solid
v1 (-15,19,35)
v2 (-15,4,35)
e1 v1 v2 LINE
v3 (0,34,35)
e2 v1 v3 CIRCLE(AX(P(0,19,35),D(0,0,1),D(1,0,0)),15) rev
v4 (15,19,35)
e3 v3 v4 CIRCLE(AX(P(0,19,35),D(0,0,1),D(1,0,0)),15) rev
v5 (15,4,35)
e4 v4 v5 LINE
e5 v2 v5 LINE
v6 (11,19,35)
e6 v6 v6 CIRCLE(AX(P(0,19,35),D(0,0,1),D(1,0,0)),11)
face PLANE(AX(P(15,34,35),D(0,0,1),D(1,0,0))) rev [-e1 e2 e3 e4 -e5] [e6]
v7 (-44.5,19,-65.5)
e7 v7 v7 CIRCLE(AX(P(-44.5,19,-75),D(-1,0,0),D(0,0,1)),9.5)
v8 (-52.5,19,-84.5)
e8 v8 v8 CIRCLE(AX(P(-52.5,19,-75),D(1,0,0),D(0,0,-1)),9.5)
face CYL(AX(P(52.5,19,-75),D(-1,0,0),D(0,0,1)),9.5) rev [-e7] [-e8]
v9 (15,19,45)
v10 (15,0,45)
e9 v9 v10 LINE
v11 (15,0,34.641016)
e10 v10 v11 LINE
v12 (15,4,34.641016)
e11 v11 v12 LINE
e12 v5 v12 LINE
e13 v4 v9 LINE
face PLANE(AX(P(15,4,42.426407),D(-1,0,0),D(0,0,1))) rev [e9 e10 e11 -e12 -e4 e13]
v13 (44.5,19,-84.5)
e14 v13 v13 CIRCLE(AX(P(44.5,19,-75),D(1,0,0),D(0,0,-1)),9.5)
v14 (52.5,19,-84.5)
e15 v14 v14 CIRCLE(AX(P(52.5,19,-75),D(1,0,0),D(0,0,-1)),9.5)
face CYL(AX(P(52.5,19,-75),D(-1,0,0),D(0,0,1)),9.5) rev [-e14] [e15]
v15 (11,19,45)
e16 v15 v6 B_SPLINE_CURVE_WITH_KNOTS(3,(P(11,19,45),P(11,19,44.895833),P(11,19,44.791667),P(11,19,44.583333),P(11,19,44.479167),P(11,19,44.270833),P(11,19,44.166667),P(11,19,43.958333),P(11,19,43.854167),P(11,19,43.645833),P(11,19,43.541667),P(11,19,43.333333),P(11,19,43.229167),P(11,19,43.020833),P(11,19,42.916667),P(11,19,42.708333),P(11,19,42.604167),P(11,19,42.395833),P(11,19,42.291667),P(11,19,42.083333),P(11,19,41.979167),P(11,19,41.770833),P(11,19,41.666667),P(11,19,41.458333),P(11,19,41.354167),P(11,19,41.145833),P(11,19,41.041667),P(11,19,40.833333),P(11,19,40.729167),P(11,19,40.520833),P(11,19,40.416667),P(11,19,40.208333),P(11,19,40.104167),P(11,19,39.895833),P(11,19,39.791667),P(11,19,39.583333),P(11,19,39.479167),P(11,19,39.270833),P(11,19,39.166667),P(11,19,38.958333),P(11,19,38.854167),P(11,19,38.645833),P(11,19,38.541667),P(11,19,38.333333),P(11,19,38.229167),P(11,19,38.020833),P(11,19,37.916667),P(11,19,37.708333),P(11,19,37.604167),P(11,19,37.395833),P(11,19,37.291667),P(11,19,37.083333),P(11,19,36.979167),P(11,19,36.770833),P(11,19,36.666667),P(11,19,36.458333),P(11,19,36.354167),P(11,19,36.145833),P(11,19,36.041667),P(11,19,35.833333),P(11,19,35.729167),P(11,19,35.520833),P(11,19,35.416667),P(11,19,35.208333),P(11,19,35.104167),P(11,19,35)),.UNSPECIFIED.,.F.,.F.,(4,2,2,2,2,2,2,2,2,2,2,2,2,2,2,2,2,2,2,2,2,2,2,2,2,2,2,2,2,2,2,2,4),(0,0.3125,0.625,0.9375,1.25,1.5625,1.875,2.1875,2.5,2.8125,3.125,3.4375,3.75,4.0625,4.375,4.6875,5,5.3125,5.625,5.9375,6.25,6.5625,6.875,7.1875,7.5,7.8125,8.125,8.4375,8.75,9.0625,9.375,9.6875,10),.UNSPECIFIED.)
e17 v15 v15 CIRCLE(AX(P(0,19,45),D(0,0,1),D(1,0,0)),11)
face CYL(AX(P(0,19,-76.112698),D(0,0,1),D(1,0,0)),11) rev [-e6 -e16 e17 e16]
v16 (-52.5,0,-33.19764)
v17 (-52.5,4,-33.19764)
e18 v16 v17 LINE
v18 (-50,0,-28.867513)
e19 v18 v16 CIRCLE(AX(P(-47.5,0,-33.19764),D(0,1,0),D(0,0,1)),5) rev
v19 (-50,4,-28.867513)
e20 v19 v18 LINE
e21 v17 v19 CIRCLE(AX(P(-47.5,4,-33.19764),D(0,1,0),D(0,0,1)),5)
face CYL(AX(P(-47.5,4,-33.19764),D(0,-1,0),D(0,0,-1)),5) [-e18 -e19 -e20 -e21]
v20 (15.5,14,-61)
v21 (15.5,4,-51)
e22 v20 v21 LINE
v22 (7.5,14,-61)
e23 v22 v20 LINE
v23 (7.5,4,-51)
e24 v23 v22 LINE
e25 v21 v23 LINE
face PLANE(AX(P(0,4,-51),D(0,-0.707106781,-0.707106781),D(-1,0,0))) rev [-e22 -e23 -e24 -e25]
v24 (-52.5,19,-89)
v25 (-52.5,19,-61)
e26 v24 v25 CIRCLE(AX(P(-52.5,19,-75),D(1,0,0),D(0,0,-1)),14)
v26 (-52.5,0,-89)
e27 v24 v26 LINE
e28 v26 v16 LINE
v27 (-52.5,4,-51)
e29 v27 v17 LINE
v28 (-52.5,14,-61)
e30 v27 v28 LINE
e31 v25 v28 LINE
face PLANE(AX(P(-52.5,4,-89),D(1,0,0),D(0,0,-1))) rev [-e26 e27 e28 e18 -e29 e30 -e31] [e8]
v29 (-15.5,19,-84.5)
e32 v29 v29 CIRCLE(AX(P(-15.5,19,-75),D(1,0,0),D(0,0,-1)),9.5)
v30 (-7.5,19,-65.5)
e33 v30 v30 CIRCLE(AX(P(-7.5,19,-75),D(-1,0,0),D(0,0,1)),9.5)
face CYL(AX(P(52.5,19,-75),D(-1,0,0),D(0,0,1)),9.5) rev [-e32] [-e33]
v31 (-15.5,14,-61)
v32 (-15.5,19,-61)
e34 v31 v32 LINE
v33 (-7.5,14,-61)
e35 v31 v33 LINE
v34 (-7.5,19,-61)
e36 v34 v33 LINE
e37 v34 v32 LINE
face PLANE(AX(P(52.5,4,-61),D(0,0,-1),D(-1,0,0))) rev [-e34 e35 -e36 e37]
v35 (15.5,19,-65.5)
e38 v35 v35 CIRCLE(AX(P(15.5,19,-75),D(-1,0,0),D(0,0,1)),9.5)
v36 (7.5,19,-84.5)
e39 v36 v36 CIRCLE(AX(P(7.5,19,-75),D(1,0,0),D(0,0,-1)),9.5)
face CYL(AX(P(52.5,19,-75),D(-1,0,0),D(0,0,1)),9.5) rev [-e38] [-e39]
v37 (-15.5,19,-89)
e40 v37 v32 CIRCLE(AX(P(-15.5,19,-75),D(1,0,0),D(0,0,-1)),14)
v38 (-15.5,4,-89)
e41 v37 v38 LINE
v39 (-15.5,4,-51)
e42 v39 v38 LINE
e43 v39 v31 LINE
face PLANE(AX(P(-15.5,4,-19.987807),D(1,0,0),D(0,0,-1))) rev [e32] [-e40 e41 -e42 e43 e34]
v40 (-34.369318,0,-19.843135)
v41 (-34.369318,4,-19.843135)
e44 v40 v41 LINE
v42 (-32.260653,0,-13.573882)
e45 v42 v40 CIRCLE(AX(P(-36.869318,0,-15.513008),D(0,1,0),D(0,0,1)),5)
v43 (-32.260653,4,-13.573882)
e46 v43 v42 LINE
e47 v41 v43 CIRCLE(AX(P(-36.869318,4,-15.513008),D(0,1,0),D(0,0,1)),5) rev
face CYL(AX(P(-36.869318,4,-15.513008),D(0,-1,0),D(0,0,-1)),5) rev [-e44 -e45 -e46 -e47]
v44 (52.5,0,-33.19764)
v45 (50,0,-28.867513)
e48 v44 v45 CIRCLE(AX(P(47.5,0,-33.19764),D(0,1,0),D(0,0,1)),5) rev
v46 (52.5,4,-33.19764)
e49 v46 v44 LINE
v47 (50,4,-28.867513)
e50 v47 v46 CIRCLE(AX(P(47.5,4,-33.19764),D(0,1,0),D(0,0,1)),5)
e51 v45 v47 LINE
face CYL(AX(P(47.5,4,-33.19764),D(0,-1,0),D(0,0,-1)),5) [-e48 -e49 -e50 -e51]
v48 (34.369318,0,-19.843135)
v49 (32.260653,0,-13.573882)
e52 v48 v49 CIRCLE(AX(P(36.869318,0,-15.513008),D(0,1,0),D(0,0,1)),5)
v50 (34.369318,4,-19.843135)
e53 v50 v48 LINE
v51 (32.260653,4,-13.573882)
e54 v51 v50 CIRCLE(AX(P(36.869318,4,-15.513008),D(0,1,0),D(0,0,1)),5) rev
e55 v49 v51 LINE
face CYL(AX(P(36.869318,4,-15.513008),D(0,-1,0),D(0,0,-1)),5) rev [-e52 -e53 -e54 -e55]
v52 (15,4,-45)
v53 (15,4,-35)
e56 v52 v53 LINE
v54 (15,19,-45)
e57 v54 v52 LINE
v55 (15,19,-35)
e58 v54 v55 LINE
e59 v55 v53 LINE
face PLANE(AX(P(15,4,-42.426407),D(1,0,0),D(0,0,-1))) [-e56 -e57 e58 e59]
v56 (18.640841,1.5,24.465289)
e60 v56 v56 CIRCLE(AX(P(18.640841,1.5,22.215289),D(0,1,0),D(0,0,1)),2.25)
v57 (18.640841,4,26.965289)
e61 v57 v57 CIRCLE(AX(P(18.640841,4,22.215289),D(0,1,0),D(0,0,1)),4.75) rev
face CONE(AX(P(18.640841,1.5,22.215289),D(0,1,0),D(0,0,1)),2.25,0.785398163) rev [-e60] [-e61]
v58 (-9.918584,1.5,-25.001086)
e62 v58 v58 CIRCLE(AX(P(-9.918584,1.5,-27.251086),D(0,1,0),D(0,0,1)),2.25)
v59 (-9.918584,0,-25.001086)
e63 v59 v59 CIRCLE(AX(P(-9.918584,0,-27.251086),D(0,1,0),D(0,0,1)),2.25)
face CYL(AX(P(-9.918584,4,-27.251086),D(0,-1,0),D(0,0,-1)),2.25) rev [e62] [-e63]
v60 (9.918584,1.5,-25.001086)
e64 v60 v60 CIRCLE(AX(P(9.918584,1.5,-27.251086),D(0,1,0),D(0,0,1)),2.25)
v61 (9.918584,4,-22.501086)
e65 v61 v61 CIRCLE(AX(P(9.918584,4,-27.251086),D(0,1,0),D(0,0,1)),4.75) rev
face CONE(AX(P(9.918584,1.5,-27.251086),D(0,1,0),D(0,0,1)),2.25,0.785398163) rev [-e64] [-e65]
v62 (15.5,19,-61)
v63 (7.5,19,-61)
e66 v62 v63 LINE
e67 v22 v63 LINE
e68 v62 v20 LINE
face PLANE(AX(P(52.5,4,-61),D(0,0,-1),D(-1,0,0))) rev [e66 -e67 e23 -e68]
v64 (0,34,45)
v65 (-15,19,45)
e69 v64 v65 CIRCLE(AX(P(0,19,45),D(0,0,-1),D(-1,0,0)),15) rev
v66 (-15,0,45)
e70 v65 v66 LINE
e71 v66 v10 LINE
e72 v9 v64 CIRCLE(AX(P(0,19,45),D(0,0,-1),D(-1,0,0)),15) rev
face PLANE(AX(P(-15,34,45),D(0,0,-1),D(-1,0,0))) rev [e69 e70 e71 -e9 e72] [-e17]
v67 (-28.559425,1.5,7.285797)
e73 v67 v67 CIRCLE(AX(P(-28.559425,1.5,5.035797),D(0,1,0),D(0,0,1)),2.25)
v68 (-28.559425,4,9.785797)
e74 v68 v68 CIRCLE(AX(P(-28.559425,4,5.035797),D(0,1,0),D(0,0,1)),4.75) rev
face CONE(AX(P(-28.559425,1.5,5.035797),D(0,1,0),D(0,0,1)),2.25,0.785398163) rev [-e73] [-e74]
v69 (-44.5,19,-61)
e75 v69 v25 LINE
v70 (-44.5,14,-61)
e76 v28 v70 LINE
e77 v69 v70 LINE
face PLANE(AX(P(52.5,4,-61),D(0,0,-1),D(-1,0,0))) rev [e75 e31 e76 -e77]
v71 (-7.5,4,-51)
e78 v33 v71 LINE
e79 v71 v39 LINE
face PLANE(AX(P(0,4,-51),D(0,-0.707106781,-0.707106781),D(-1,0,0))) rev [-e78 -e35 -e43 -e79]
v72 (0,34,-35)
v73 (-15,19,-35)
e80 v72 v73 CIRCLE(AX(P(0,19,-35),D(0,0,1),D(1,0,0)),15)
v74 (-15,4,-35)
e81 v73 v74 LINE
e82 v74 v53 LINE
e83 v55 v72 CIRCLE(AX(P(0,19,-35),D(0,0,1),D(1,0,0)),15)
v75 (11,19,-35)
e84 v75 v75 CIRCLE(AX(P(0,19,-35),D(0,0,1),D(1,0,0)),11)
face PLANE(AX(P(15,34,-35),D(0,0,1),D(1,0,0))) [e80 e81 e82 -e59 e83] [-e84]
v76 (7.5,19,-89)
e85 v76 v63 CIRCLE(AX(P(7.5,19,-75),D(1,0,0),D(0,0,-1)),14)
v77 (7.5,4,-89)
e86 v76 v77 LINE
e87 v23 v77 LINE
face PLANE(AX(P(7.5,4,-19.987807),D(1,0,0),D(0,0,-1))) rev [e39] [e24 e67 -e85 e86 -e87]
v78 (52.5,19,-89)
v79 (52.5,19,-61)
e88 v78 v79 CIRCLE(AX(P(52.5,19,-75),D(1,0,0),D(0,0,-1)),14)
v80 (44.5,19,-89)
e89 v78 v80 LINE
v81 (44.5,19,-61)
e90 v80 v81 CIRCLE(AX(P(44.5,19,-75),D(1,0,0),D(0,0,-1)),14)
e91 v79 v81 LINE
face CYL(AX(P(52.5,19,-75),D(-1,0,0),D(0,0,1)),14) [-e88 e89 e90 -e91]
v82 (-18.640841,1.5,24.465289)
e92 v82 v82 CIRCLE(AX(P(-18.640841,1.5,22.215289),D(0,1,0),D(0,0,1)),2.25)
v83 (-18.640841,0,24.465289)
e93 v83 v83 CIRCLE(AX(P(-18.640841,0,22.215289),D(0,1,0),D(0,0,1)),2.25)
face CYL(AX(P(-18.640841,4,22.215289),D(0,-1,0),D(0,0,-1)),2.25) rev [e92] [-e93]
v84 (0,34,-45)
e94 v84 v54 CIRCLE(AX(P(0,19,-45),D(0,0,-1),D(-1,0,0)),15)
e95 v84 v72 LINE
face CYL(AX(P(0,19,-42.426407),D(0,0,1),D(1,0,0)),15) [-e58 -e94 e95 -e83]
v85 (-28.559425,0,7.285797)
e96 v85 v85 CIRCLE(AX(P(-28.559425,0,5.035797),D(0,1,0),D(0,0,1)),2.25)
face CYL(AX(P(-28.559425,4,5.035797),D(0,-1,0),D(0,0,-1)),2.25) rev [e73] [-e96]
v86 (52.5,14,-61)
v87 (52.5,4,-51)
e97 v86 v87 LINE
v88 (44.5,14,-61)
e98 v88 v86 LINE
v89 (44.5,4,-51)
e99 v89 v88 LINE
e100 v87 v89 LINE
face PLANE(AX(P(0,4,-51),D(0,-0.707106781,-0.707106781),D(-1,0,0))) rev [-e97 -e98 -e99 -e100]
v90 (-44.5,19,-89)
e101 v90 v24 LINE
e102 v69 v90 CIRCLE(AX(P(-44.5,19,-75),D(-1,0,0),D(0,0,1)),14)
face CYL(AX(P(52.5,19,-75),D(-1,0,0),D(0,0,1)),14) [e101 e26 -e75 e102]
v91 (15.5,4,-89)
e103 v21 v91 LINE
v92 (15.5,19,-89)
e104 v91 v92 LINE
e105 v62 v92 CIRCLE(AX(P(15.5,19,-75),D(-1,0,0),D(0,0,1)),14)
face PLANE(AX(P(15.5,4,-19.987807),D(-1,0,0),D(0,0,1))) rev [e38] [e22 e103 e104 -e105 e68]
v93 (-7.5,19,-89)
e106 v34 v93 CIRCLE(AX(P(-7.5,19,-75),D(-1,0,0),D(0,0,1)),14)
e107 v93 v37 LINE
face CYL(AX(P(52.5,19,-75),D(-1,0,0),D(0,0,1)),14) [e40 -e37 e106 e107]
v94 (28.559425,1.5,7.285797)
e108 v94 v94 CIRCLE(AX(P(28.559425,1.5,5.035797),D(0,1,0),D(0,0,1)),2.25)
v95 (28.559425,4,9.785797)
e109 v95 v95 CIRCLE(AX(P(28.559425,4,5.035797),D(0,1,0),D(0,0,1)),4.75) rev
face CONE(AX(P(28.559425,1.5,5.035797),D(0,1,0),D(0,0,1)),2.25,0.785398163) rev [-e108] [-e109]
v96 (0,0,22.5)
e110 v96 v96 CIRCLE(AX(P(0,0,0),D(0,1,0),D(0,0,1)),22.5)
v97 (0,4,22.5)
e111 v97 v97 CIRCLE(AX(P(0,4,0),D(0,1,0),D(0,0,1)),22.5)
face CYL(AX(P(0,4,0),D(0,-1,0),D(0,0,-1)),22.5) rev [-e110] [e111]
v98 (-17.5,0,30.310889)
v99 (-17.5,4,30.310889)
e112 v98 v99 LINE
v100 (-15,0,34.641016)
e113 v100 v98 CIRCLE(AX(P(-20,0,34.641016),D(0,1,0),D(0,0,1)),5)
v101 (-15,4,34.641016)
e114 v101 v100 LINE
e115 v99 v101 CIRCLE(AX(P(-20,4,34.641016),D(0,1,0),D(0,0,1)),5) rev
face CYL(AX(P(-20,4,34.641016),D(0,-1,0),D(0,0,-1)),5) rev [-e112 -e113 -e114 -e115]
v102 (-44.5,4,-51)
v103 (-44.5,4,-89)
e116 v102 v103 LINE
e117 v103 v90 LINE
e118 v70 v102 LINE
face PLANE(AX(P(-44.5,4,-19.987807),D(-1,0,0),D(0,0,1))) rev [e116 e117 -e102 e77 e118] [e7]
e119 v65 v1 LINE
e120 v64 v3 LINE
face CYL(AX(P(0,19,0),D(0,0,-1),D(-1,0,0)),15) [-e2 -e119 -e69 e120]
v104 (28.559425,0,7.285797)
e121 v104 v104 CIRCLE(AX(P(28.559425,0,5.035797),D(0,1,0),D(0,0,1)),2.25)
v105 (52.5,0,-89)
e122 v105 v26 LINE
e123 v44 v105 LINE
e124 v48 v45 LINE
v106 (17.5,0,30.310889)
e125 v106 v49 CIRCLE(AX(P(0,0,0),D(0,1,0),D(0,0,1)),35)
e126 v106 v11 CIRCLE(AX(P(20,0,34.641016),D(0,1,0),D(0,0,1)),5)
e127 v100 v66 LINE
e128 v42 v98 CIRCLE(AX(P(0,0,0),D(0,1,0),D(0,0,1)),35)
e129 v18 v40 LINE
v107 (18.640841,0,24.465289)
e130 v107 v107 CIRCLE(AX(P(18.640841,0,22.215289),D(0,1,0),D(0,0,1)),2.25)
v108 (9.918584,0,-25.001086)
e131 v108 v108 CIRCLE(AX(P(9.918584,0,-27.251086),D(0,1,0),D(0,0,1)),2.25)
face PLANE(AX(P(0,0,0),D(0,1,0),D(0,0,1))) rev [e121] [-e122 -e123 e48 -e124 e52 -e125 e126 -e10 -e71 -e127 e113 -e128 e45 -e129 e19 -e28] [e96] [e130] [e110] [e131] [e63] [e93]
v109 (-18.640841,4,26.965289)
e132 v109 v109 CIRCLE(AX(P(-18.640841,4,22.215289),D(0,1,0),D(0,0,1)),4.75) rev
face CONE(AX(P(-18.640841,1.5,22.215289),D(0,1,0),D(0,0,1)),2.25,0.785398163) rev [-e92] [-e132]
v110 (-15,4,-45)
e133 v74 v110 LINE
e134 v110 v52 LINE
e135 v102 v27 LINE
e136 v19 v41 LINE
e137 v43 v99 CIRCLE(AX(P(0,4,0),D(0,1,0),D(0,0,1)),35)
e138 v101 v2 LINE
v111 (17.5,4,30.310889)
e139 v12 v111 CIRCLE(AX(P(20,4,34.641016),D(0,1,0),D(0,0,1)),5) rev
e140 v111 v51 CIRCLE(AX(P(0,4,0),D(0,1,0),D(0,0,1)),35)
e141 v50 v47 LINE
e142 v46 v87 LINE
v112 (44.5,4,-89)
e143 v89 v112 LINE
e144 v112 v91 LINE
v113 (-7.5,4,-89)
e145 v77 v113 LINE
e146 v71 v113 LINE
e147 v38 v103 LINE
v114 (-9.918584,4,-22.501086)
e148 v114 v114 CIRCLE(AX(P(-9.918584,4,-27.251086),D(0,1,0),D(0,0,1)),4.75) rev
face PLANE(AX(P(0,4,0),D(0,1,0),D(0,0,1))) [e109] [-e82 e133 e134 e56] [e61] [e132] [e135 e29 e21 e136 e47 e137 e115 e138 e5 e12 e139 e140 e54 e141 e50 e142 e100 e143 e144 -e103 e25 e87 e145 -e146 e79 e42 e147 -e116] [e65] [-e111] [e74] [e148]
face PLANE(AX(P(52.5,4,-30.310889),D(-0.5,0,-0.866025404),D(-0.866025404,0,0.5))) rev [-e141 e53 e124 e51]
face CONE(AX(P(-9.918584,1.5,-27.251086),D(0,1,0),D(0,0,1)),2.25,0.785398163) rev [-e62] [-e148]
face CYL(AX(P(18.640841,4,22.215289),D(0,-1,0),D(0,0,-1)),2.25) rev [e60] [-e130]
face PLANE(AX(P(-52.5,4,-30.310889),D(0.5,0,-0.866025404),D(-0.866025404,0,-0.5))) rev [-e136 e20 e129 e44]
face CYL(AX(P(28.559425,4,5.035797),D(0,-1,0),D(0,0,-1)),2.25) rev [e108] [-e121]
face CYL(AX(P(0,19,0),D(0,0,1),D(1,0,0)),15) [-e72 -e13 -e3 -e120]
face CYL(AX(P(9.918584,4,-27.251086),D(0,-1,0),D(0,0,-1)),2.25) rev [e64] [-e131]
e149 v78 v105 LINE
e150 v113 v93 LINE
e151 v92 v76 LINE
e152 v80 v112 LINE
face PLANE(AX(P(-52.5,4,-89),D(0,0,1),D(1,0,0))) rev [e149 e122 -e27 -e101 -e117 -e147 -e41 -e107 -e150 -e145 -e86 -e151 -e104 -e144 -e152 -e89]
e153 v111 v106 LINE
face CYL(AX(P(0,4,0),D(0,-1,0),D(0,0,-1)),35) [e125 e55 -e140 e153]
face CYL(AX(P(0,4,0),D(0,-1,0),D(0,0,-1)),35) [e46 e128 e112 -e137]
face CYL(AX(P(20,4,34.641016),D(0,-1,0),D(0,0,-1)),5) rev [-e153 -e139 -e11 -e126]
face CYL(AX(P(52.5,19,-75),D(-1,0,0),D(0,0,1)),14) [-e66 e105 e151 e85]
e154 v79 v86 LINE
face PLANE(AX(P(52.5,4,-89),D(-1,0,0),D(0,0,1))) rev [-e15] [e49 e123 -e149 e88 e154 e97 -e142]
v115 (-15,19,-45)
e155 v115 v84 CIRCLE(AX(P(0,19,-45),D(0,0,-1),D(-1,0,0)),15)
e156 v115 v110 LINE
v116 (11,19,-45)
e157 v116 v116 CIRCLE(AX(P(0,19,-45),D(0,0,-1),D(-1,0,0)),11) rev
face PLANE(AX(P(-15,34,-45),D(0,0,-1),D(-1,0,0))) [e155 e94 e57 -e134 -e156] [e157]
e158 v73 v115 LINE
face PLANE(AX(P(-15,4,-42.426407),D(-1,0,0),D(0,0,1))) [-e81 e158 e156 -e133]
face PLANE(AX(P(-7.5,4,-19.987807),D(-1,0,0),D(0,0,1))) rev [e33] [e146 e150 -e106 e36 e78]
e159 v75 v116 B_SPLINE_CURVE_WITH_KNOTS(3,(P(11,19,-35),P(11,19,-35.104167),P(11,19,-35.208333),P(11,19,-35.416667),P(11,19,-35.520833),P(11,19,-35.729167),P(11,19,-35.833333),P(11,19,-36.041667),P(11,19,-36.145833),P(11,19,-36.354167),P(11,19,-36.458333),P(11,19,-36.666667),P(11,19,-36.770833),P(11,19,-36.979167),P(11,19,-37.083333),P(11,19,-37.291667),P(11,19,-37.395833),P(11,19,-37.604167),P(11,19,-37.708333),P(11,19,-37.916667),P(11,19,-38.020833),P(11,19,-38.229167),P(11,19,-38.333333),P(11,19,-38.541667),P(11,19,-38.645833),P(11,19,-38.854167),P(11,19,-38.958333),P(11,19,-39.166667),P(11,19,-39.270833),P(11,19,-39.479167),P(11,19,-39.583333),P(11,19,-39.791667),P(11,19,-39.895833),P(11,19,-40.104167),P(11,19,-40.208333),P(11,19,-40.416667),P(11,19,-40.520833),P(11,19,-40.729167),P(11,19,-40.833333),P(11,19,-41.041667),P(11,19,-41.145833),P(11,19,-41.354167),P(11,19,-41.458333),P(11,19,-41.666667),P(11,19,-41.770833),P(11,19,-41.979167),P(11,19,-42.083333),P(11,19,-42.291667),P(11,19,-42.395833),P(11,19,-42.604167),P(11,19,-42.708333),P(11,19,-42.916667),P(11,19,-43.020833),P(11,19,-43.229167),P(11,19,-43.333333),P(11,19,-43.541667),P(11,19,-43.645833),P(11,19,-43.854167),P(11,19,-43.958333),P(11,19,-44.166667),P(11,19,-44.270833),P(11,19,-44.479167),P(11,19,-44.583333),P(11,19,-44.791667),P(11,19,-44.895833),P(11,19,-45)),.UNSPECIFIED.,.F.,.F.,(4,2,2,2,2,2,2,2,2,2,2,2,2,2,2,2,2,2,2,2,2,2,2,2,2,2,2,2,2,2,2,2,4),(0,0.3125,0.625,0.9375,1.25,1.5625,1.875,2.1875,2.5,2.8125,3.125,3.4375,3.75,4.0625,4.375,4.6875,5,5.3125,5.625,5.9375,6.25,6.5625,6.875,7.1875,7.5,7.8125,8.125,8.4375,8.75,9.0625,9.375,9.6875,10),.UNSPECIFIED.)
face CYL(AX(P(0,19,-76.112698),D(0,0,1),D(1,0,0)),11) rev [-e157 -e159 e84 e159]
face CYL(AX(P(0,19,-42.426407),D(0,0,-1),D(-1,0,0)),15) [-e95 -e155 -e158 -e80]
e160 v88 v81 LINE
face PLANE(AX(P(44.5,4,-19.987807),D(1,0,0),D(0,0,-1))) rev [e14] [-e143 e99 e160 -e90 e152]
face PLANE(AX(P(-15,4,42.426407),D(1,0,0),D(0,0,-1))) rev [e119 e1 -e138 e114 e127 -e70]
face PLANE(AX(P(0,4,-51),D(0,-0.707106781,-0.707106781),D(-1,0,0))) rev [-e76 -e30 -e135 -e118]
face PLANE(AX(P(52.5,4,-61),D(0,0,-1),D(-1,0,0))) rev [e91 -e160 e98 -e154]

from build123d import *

# Parameters (mm, degrees)
SKETCH_1_R          = 35
SKETCH_1_R_2        = 22.5
SKETCH_1_R_3        = 2.25
EXTRUDE_1_DEPTH     = 4
EXTRUDE_2_DEPTH     = 4
SKETCH_3_W          = 30
SKETCH_3_H          = 10
EXTRUDE_3_DEPTH     = 34
EXTRUDE_4_DEPTH     = 4
SKETCH_5_R          = 9.5
EXTRUDE_5_DEPTH     = 52.5
SKETCH_6_W          = 29
SKETCH_6_H          = 29
SKETCH_6_W_2        = 15
CUT_EXTRUDE_1_DEPTH = 28
CUT_EXTRUDE_2_REACH = 149.879
SKETCH_7_R          = 11
FILLET_1_R          = 15
FILLET_3_R          = 5
CHAMFER_1_SIZE      = 2.5
CHAMFER_2_SIZE      = 10


with BuildPart() as part:
    # 草图1 → 凸台-拉伸1 (new body)
    with BuildSketch(Plane(origin=(0, 0, 0), x_dir=(1, 0, 0), z_dir=(0, 1, 0))):
        with Locations(Location((0, 0, 0), (0, 0, 270))):
            Circle(SKETCH_1_R)
        with Locations(Location((0, 0, 0), (0, 0, 270))):
            Circle(SKETCH_1_R_2, mode=Mode.SUBTRACT)
        with Locations(Location((-9.918584156, 27.251086003, 0), (0, 0, 270))):
            Circle(SKETCH_1_R_3, mode=Mode.SUBTRACT)
        with Locations(Location((9.918584156, 27.251086003, 0), (0, 0, 270))):
            Circle(SKETCH_1_R_3, mode=Mode.SUBTRACT)
        with Locations(Location((28.559424837, -5.035797152, 0), (0, 0, 270))):
            Circle(SKETCH_1_R_3, mode=Mode.SUBTRACT)
        with Locations(Location((18.640840681, -22.21528885, 0), (0, 0, 270))):
            Circle(SKETCH_1_R_3, mode=Mode.SUBTRACT)
        with Locations(Location((-18.640840681, -22.21528885, 0), (0, 0, 270))):
            Circle(SKETCH_1_R_3, mode=Mode.SUBTRACT)
        with Locations(Location((-28.559424837, -5.035797152, 0), (0, 0, 270))):
            Circle(SKETCH_1_R_3, mode=Mode.SUBTRACT)
    extrude(amount=EXTRUDE_1_DEPTH)

    # 草图2 → 凸台-拉伸2 (add)
    with BuildSketch(Plane(origin=(0, 0, 0), x_dir=(1, 0, 0), z_dir=(0, 1, 0))):
        with BuildLine():
            Line((15, -42.426406871), (15, -31.622776602))
            ThreePointArc((15, -31.622776602), (0, -35), (-15, -31.622776602))
            Line((-15, -31.622776602), (-15, -42.426406871))
            ThreePointArc((-15, -42.426406871), (0, -45), (15, -42.426406871))
        make_face()
    extrude_2 = extrude(amount=EXTRUDE_2_DEPTH)

    # 草图3 → 凸台-拉伸3 (add)
    with BuildSketch(Plane(origin=(0, 0, 0), x_dir=(1, 0, 0), z_dir=(0, 1, 0))):
        with Locations((0, -40)):
            Rectangle(SKETCH_3_W, SKETCH_3_H)
    extrude_3 = extrude(amount=EXTRUDE_3_DEPTH)

    # 镜向1: 凸台-拉伸2, 凸台-拉伸3 across plane
    add(extrude_2.mirror(Plane.XY))
    add(extrude_3.mirror(Plane.XY))

    # 草图4 → 凸台-拉伸4 (add)
    with BuildSketch(Plane(origin=(0, 0, 0), x_dir=(1, 0, 0), z_dir=(0, 1, 0))):
        with BuildLine():
            Line((-52.5, 89), (52.5, 89))
            Line((52.5, 89), (52.5, 30.310889132))
            Line((52.5, 30.310889132), (30.310889132, 17.5))
            ThreePointArc((30.310889132, 17.5), (0, 35), (-30.310889132, 17.5))
            Line((-30.310889132, 17.5), (-52.5, 30.310889132))
            Line((-52.5, 30.310889132), (-52.5, 89))
        make_face()
    extrude(amount=EXTRUDE_4_DEPTH)

    # 草图5 → 凸台-拉伸5 (add, symmetric)
    with BuildSketch(Plane(origin=(0, 0, 0), x_dir=(0, 0, -1), z_dir=(1, 0, 0))):
        with BuildLine():
            Line((89, 4), (61, 4))
            Line((61, 4), (61, 19))
            ThreePointArc((61, 19), (75, 33), (89, 19))
            Line((89, 19), (89, 4))
        make_face()
        with Locations((75, 19)):
            Circle(SKETCH_5_R, mode=Mode.SUBTRACT)
    extrude(amount=EXTRUDE_5_DEPTH, both=True)

    # 草图6 → 切除-拉伸1 (cut)
    with BuildSketch(Plane(origin=(0, 0, -89), x_dir=(-1, 0, 0), z_dir=(0, 0, -1))):
        with Locations((-30, 18.5)):
            Rectangle(SKETCH_6_W, SKETCH_6_H)
        with Locations((0, 18.5)):
            Rectangle(SKETCH_6_W_2, SKETCH_6_H)
        with Locations((30, 18.5)):
            Rectangle(SKETCH_6_W, SKETCH_6_H)
    extrude(amount=-CUT_EXTRUDE_1_DEPTH, mode=Mode.SUBTRACT)

    # 切除-拉伸2: up to this face of the body (flat: up to its plane)
    cut_extrude_2_end = Plane(part.part.faces().sort_by_distance((0, 19, -45))[0])
    # 草图7 → 切除-拉伸2 (cut, up to the picked face)
    with BuildSketch(Plane.XY.offset(45), mode=Mode.PRIVATE) as cut_extrude_2_sk1:
        with Locations((0, 19)):
            Circle(SKETCH_7_R)
    cut_extrude_2_tool1 = split(extrude(cut_extrude_2_sk1.sketch, amount=-CUT_EXTRUDE_2_REACH, mode=Mode.PRIVATE), bisect_by=cut_extrude_2_end, keep=Keep.BOTH, mode=Mode.PRIVATE)
    add(cut_extrude_2_tool1.solids().sort_by(Axis((0, 19, 45), (0, 0, -1)))[0], mode=Mode.SUBTRACT)

    # 圆角1
    fillet_1_edges = [part.edges().sort_by_distance(p)[0] for p in [
        (15, 34, -40),
        (-15, 34, -40),
        (-15, 34, 40),
        (15, 34, 40),
    ]]
    fillet(fillet_1_edges, radius=FILLET_1_R - 0.0001)  # a hair under: the kernel refuses the full size

    # 圆角3
    fillet_3_edges = [part.edges().sort_by_distance(p)[0] for p in [
        (-30.310889132, 2, -17.5),
        (30.310889132, 2, -17.5),
        (52.5, 2, -30.310889132),
        (-52.5, 2, -30.310889132),
        (15, 2, 31.622776602),
        (-15, 2, 31.622776602),
    ]]
    fillet(fillet_3_edges, radius=FILLET_3_R)

    # 倒角1
    chamfer_1_edges = [part.edges().sort_by_distance(p)[0] for p in [
        (-9.918584156, 4, -29.501086003),
        (28.559424837, 4, 2.785797152),
        (18.640840681, 4, 19.96528885),
        (-18.640840681, 4, 19.96528885),
        (-28.559424837, 4, 2.785797152),
        (9.918584156, 4, -29.501086003),
    ]]
    chamfer(chamfer_1_edges, length=CHAMFER_1_SIZE)

    # 倒角2
    chamfer_2_edges = [part.edges().sort_by_distance(p)[0] for p in [
        (48.5, 4, -61),
        (11.5, 4, -61),
        (-11.5, 4, -61),
        (-48.5, 4, -61),
    ]]
    chamfer(chamfer_2_edges, length=CHAMFER_2_SIZE)


solid = part.part
